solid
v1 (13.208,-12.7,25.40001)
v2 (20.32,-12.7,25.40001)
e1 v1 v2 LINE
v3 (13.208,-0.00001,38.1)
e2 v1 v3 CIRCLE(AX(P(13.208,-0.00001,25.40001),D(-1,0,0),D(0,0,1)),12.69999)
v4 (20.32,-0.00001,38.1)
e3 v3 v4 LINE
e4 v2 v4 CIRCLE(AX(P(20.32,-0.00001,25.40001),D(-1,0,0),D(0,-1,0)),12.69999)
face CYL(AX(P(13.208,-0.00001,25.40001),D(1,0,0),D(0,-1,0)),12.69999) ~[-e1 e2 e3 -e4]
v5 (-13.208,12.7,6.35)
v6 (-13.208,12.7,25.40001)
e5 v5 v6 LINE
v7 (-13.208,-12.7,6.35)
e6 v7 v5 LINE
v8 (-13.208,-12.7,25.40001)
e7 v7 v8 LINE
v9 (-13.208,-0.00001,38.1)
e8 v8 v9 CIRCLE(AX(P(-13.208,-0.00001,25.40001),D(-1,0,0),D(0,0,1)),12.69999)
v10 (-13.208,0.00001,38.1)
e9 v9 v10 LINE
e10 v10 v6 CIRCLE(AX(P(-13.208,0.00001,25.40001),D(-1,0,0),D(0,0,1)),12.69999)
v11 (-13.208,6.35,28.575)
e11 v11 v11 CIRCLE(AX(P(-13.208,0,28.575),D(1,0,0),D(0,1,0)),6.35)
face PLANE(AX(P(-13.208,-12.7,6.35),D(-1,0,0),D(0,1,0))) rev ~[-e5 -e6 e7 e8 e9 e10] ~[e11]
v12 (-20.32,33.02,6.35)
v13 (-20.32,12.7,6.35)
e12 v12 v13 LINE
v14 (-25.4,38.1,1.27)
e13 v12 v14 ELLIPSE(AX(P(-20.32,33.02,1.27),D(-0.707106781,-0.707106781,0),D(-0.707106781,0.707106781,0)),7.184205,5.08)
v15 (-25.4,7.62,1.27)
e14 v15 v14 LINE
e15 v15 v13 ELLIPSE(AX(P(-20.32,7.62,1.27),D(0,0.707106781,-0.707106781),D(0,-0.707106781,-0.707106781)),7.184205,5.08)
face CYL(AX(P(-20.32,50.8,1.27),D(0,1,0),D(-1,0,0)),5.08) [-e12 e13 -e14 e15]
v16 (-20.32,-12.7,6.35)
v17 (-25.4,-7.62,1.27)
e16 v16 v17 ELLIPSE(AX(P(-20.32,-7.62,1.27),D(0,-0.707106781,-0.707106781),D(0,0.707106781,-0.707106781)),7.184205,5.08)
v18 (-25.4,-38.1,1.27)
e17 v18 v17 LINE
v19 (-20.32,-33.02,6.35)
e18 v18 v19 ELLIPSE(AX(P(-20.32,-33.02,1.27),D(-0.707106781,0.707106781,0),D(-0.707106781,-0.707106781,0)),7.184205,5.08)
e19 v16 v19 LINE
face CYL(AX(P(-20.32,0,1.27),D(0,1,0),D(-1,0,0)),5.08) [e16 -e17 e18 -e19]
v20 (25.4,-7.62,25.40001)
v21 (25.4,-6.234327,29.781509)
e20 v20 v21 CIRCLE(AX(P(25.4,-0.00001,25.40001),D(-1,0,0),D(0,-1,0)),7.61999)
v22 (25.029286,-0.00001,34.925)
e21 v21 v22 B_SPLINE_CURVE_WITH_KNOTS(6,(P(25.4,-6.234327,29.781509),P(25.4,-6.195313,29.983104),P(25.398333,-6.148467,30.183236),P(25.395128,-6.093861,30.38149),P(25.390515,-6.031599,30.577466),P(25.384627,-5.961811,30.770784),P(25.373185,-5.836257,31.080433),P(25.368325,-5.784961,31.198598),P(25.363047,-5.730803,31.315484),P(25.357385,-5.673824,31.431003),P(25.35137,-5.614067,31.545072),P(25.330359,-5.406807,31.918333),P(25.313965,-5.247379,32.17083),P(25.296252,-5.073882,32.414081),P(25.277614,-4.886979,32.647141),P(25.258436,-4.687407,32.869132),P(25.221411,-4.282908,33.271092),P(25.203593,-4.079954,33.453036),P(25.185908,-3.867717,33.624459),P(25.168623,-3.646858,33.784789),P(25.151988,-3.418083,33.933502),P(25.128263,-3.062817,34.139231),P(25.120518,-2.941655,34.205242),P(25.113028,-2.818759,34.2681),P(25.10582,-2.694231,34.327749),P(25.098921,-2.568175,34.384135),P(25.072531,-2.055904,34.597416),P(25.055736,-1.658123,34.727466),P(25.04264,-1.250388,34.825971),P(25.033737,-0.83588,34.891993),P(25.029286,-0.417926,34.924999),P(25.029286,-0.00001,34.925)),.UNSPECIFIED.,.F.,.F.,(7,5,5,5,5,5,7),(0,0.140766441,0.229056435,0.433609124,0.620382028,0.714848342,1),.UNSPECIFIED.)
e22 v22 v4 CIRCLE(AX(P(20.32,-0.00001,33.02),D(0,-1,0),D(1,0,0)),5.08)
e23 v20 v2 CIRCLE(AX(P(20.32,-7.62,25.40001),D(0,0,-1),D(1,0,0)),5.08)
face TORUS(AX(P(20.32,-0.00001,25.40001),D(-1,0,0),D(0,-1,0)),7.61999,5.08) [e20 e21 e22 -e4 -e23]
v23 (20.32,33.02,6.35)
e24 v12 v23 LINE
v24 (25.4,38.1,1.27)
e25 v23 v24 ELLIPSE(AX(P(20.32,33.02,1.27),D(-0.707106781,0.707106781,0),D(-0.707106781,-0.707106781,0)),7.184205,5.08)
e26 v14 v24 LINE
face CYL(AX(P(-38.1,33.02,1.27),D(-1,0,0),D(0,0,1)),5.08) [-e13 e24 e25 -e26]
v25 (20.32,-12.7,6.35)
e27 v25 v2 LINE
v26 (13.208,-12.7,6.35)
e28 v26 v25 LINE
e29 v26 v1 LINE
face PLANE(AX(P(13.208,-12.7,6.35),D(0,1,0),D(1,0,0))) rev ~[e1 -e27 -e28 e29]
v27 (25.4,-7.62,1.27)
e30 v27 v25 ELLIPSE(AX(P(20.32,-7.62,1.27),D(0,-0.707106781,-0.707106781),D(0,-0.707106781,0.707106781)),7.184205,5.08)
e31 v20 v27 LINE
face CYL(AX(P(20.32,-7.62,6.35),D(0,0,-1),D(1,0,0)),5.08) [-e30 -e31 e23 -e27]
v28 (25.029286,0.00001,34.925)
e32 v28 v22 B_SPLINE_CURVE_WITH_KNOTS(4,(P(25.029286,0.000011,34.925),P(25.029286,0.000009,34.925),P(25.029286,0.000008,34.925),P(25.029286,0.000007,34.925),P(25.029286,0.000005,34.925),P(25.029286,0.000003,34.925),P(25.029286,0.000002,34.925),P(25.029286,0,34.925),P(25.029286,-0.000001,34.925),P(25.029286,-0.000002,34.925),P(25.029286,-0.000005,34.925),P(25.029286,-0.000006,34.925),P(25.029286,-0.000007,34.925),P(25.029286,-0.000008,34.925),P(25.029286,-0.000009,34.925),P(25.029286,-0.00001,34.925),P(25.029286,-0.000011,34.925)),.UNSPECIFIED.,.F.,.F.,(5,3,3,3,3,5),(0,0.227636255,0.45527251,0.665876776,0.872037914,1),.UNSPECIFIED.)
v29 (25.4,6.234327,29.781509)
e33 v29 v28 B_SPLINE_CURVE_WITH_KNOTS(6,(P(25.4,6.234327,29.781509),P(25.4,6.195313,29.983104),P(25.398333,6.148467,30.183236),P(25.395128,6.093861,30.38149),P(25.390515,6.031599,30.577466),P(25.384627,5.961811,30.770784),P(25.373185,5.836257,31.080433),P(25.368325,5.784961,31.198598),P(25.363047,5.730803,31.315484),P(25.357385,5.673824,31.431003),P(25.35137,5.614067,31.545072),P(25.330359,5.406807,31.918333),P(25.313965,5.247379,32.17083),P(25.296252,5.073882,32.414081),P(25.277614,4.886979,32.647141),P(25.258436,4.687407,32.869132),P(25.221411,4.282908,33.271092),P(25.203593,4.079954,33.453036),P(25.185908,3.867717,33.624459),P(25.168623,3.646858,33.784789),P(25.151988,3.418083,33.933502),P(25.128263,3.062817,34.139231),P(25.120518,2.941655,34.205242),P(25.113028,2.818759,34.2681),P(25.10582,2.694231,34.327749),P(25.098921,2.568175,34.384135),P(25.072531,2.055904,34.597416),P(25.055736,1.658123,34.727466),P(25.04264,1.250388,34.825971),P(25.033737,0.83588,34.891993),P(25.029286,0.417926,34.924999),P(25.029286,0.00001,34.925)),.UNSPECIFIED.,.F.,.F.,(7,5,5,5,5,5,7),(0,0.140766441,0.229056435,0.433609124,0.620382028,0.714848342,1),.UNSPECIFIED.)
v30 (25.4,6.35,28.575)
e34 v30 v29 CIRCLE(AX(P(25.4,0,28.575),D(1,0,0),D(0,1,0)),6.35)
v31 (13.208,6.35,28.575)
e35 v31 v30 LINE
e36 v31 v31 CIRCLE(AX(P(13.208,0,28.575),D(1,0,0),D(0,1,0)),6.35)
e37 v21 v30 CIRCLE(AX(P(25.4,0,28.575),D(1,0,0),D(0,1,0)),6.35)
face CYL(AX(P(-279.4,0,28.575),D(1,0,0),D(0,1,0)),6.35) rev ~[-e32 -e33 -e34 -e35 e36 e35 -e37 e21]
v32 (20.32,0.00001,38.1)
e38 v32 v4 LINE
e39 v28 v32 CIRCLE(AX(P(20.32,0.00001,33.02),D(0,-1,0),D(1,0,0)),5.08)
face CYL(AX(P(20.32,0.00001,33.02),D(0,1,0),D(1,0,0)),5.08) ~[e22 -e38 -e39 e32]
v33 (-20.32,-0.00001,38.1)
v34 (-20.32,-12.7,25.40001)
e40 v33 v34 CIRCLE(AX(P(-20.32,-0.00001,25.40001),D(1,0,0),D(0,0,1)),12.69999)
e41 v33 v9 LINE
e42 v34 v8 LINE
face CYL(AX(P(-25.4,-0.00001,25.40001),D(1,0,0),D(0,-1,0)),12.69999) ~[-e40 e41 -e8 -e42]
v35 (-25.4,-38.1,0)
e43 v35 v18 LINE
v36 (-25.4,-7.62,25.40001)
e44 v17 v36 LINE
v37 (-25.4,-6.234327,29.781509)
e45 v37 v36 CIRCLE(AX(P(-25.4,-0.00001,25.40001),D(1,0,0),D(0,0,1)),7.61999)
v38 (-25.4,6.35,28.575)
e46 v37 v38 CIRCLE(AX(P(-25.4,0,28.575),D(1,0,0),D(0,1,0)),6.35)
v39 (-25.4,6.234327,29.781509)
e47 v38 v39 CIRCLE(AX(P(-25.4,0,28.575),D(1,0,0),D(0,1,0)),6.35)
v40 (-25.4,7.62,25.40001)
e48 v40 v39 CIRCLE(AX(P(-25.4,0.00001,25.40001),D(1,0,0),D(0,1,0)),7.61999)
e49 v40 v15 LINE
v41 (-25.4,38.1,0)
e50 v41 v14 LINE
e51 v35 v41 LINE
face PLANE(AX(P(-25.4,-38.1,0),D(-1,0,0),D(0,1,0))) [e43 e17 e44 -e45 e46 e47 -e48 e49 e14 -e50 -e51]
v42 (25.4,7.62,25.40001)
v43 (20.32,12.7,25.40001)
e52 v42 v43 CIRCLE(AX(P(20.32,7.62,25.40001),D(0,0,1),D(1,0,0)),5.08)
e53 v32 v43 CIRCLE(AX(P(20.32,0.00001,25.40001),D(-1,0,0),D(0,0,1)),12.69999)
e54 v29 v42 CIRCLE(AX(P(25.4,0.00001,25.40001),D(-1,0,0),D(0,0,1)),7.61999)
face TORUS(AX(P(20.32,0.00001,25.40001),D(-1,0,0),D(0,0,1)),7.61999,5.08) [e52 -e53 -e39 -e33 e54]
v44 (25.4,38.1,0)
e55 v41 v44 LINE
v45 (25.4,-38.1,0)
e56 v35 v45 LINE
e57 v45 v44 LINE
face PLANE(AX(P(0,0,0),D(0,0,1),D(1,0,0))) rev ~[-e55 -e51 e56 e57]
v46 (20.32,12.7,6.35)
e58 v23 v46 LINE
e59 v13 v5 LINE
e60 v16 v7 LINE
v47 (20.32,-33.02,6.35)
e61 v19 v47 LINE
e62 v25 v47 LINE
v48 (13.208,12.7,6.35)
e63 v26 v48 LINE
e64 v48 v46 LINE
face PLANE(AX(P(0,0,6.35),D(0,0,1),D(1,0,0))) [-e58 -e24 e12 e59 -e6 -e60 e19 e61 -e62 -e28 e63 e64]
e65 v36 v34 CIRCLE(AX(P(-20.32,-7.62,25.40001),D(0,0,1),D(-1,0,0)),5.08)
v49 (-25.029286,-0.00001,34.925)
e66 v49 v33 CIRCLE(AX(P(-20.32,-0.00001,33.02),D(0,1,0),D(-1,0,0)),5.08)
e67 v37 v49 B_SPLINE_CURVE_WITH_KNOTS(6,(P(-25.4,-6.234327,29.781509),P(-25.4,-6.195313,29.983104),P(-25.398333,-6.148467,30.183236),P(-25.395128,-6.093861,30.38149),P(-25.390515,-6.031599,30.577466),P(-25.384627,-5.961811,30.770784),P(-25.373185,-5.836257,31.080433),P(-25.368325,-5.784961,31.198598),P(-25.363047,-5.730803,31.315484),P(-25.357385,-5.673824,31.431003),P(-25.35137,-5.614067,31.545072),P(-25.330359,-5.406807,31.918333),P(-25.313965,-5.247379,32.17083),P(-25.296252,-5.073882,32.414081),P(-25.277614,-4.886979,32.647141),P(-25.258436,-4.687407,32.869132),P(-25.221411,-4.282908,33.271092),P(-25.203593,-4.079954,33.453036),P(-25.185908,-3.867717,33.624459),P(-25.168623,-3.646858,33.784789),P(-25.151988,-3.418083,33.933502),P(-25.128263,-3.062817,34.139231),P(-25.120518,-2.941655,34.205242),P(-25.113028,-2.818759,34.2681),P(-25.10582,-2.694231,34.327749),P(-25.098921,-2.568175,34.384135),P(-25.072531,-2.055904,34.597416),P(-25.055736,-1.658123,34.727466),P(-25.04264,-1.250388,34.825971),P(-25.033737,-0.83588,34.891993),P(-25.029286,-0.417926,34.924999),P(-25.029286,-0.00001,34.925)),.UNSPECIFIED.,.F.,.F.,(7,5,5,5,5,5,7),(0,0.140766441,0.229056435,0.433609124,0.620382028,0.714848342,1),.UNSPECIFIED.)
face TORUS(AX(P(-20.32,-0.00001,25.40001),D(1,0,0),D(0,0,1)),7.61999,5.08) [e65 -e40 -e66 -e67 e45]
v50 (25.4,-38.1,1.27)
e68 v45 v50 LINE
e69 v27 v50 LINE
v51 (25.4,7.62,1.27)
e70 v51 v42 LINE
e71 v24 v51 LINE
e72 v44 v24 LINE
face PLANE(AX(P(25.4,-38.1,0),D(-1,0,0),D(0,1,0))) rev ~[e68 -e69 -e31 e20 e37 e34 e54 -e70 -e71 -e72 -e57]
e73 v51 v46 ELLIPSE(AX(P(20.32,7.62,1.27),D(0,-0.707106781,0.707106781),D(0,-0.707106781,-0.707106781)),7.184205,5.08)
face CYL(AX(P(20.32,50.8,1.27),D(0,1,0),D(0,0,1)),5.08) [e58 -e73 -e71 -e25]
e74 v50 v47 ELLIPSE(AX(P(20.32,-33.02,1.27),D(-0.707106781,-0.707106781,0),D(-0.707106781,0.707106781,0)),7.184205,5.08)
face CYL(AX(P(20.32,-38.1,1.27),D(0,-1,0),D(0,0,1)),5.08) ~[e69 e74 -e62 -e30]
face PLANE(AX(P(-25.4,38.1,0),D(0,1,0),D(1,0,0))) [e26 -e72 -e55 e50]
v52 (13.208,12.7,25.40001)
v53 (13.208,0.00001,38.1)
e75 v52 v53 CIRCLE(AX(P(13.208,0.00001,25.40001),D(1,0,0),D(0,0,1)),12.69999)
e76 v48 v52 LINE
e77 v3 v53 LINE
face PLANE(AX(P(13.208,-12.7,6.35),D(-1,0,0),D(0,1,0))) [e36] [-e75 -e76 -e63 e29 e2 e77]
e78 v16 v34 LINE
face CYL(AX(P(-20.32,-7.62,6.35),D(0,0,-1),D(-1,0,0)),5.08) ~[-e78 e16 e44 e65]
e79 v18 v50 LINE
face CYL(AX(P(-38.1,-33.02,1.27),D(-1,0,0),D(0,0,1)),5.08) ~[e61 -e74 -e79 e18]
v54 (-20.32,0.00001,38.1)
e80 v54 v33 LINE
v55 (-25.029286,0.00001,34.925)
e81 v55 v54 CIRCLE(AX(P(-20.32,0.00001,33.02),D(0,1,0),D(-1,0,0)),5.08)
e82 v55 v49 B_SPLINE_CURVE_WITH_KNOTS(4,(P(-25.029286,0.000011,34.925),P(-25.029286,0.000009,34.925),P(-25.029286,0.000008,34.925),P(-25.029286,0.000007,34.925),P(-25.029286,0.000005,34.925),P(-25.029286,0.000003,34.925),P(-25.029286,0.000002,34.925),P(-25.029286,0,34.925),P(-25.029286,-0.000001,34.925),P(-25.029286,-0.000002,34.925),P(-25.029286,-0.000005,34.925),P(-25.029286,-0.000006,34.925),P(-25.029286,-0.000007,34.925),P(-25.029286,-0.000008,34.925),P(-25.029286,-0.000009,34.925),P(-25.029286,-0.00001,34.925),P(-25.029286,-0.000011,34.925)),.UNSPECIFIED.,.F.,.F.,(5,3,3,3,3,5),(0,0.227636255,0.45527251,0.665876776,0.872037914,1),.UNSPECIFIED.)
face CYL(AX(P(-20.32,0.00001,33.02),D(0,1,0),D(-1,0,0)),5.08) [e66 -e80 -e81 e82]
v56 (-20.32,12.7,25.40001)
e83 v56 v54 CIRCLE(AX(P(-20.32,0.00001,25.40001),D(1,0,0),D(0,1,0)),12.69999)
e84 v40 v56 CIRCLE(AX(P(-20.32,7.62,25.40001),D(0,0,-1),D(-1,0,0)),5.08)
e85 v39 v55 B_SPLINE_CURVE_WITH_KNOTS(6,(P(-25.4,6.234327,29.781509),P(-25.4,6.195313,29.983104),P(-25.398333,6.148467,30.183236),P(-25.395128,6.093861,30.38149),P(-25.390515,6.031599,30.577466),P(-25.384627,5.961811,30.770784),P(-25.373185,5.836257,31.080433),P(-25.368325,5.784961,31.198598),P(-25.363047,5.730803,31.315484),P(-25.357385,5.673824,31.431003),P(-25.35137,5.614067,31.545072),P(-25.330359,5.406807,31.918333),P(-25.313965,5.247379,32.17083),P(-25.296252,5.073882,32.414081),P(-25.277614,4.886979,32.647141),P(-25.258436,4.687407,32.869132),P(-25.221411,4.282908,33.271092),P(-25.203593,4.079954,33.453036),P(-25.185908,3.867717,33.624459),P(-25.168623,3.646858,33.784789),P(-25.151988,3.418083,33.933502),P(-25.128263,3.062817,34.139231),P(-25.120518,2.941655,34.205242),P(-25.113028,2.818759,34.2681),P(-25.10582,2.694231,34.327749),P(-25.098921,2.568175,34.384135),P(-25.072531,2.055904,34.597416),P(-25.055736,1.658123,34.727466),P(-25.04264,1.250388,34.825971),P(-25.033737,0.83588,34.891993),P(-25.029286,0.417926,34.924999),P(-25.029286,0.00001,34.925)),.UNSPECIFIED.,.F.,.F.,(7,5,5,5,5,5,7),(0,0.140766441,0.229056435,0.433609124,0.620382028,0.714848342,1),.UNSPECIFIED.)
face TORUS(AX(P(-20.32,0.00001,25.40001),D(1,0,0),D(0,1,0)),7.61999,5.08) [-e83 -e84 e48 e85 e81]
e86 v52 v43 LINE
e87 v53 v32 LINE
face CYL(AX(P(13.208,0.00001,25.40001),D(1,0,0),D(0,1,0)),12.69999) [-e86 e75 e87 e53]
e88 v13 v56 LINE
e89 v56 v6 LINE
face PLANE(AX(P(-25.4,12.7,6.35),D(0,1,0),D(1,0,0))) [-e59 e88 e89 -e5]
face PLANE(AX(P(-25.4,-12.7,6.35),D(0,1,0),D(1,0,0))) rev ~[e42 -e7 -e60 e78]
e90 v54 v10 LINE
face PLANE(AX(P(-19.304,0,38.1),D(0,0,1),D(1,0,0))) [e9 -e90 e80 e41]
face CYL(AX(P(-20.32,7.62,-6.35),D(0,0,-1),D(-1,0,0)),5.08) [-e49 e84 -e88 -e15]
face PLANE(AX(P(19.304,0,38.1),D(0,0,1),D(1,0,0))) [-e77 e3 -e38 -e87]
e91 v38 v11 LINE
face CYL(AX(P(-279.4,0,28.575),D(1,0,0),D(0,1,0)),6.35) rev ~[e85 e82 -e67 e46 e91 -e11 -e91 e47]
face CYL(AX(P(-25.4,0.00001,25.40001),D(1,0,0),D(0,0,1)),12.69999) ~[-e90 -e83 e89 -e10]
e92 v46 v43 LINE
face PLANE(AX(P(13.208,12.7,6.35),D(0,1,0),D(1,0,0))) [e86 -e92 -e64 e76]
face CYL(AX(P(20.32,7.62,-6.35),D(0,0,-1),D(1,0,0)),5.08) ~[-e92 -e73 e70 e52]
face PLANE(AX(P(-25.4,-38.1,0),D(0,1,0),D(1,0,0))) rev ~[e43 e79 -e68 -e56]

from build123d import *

# Parameters (mm, degrees)
F0_W         = 50.8
F0_H         = 76.2
F1_DEPTH     = 6.35
F2_W         = 12.192
F2_H         = 25.4
F3_DEPTH     = 31.75
F5_D         = 12.7
F5_DEPTH     = 254
F5_TIP       = 3.8154649308
F6_R         = 12.69999
F7_T1_DEPTH  = 19.05001
F7_T3_DEPTH  = 76.2
F7_T5_DEPTH  = 38.1
F7_T7_DEPTH  = 38.1
F7_T9_DEPTH  = 2e-05
F7_T12_ANGLE = 90
F7_T14_ANGLE = 90
F7_T16_ANGLE = 90
F7_T18_ANGLE = 90
F7_T23_DEPTH = 31.75001
F7_T28_DEPTH = 38.1
F7_T35_DEPTH = 38.1
F7_T39_DEPTH = 31.75001
F7_T47_DEPTH = 38.1
F7_T51_DEPTH = 31.75001
F7_T59_DEPTH = 31.75001
F7_T64_DEPTH = 38.1


# Not quite as in the source:
# - a fillet or chamfer that OpenCascade refuses, or shapes differently, is made with other operations: its cross-section is extruded or revolved along the edge and cut away or added
# - a fillet or chamfer is up to 0.001 mm smaller than in the source, because OpenCascade refuses the exact size


with BuildPart() as f1:
    # F0 (on Top) → F1 (new body)
    with BuildSketch(Plane.XY):
        Rectangle(F0_W, F0_H)
    extrude(amount=F1_DEPTH)

    # F2 (on face) → F3 (join)
    with BuildSketch(Plane.XY.offset(6.35)):
        with Locations((-19.304, 0)):
            Rectangle(F2_W, F2_H)
        with Locations((19.304, 0)):
            Rectangle(F2_W, F2_H)
    extrude(amount=F3_DEPTH)

    # F5
    with Locations(Plane(origin=(-25.4, 0, 0), x_dir=(0, -1, 0), z_dir=(-1, 0, 0))):
        with Locations((0, 28.575)):
            Hole(F5_D / 2, depth=F5_DEPTH)
            with Locations((0, 0, -(F5_DEPTH + F5_TIP / 2))):  # 118° drill point
                Cone(0, F5_D / 2, F5_TIP, mode=Mode.SUBTRACT)

    # F6 (radius 12.7 in the source; OpenCascade refuses exactly that, so slightly less here)
    f6_edges = [f1.edges().sort_by_distance(p)[0] for p in [
        (19.304, 12.7, 38.1),
        (19.304, -12.7, 38.1),
        (-19.304, 12.7, 38.1),
        (-19.304, -12.7, 38.1),
    ]]
    fillet(f6_edges, radius=F6_R)

    # F7: fillet of radius 5.08 on 14 edges, made by hand

    # F7_s2 → F7_t1 (cut)
    with BuildSketch(Plane.XY.offset(6.35)):
        with BuildLine():
            ThreePointArc((-25.4, 7.62), (-23.9121024484, 11.2121024484), (-20.32, 12.7))
            Line((-20.32, 12.7), (-25.4, 12.7))
            Line((-25.4, 12.7), (-25.4, 7.62))
        make_face()
        with BuildLine():
            ThreePointArc((25.4, -7.62), (23.9121024484, -11.2121024484), (20.32, -12.7))
            Line((20.32, -12.7), (25.4, -12.7))
            Line((25.4, -12.7), (25.4, -7.62))
        make_face()
        with BuildLine():
            ThreePointArc((-25.4, -7.62), (-23.9121024484, -11.2121024484), (-20.32, -12.7))
            Line((-20.32, -12.7), (-25.4, -12.7))
            Line((-25.4, -12.7), (-25.4, -7.62))
        make_face()
        with BuildLine():
            ThreePointArc((25.4, 7.62), (23.9121024484, 11.2121024484), (20.32, 12.7))
            Line((20.32, 12.7), (25.4, 12.7))
            Line((25.4, 12.7), (25.4, 7.62))
        make_face()
    extrude(amount=F7_T1_DEPTH, mode=Mode.SUBTRACT)

    # F7_s4 → F7_t3 (cut)
    with BuildSketch(Plane.YZ.offset(-38.1)):
        with BuildLine():
            ThreePointArc((-33.02, 6.35), (-36.6121024484, 4.8621024484), (-38.1, 1.27))
            Line((-38.1, 1.27), (-38.1, 6.35))
            Line((-38.1, 6.35), (-33.02, 6.35))
        make_face()
        with BuildLine():
            ThreePointArc((33.02, 6.35), (36.6121024484, 4.8621024484), (38.1, 1.27))
            Line((38.1, 1.27), (38.1, 6.35))
            Line((38.1, 6.35), (33.02, 6.35))
        make_face()
    extrude(amount=F7_T3_DEPTH, mode=Mode.SUBTRACT)

    # F7_s6 → F7_t5 (cut)
    with BuildSketch(Plane.XZ.offset(12.7)):
        with BuildLine():
            ThreePointArc((20.32, 6.35), (23.9121024484, 4.8621024484), (25.4, 1.27))
            Line((25.4, 1.27), (25.4, 6.35))
            Line((25.4, 6.35), (20.32, 6.35))
        make_face()
        with BuildLine():
            ThreePointArc((-25.4, 1.27), (-23.9121024484, 4.8621024484), (-20.32, 6.35))
            Line((-20.32, 6.35), (-25.4, 6.35))
            Line((-25.4, 6.35), (-25.4, 1.27))
        make_face()
    extrude(amount=F7_T5_DEPTH, mode=Mode.SUBTRACT)

    # F7_s8 → F7_t7 (cut)
    with BuildSketch(Plane.XZ.offset(-50.8)):
        with BuildLine():
            ThreePointArc((20.32, 6.35), (23.9121024484, 4.8621024484), (25.4, 1.27))
            Line((25.4, 1.27), (25.4, 6.35))
            Line((25.4, 6.35), (20.32, 6.35))
        make_face()
        with BuildLine():
            ThreePointArc((-25.4, 1.27), (-23.9121024484, 4.8621024484), (-20.32, 6.35))
            Line((-20.32, 6.35), (-25.4, 6.35))
            Line((-25.4, 6.35), (-25.4, 1.27))
        make_face()
    extrude(amount=F7_T7_DEPTH, mode=Mode.SUBTRACT)

    # F7_s10 → F7_t9 (cut)
    with BuildSketch(Plane.XZ.offset(-1e-05)):
        with BuildLine():
            ThreePointArc((25.4, 33.02), (23.9121024484, 36.6121024484), (20.32, 38.1))
            Line((20.32, 38.1), (25.4, 38.1))
            Line((25.4, 38.1), (25.4, 33.02))
        make_face()
        with BuildLine():
            ThreePointArc((-25.4, 33.02), (-23.9121024484, 36.6121024484), (-20.32, 38.1))
            Line((-20.32, 38.1), (-25.4, 38.1))
            Line((-25.4, 38.1), (-25.4, 33.02))
        make_face()
    extrude(amount=F7_T9_DEPTH, mode=Mode.SUBTRACT)

    # F7_s11 → F7_t12 (revolve, cut)
    with BuildSketch(Plane.XY.offset(25.40001)):
        with BuildLine():
            ThreePointArc((-25.4, 7.62), (-23.9121024484, 11.2121024484), (-20.32, 12.7))
            Line((-20.32, 12.7), (-25.4, 12.7))
            Line((-25.4, 12.7), (-25.4, 7.62))
        make_face()
    revolve(axis=Axis((-25.4, 1e-05, 25.40001), (1, 0, 0)), revolution_arc=F7_T12_ANGLE, mode=Mode.SUBTRACT)

    # F7_s13 → F7_t14 (revolve, cut)
    with BuildSketch(Plane.XZ.offset(1e-05)):
        with BuildLine():
            ThreePointArc((-25.4, 33.02), (-23.9121024484, 36.6121024484), (-20.32, 38.1))
            Line((-20.32, 38.1), (-25.4, 38.1))
            Line((-25.4, 38.1), (-25.4, 33.02))
        make_face()
    revolve(axis=Axis((-25.4, -1e-05, 25.40001), (1, 0, 0)), revolution_arc=F7_T14_ANGLE, mode=Mode.SUBTRACT)

    # F7_s15 → F7_t16 (revolve, cut)
    with BuildSketch(Plane.XY.offset(25.40001)):
        with BuildLine():
            ThreePointArc((25.4, -7.62), (23.9121024484, -11.2121024484), (20.32, -12.7))
            Line((20.32, -12.7), (25.4, -12.7))
            Line((25.4, -12.7), (25.4, -7.62))
        make_face()
    revolve(axis=Axis((25.4, -1e-05, 25.40001), (-1, 0, 0)), revolution_arc=F7_T16_ANGLE, mode=Mode.SUBTRACT)

    # F7_s17 → F7_t18 (revolve, cut)
    with BuildSketch(Plane.XZ.offset(-1e-05)):
        with BuildLine():
            ThreePointArc((25.4, 33.02), (23.9121024484, 36.6121024484), (20.32, 38.1))
            Line((20.32, 38.1), (25.4, 38.1))
            Line((25.4, 38.1), (25.4, 33.02))
        make_face()
    revolve(axis=Axis((25.4, 1e-05, 25.40001), (-1, 0, 0)), revolution_arc=F7_T18_ANGLE, mode=Mode.SUBTRACT)


with BuildPart() as f7_tool21:
    # F7_s22 → F7_t23 (new body)
    with BuildSketch(Plane.XY.offset(-6.35)):
        with BuildLine():
            ThreePointArc((-25.4, 7.62), (-23.9121024484, 11.2121024484), (-20.32, 12.7))
            Line((-20.32, 12.7), (-25.4, 12.7))
            Line((-25.4, 12.7), (-25.4, 7.62))
        make_face()
    extrude(amount=F7_T23_DEPTH)

    split(bisect_by=Plane.XY.offset(6.35), keep=Keep.BOTTOM)

    split(bisect_by=Plane.XY, keep=Keep.TOP)


with BuildPart() as f7_tool26:
    # F7_s27 → F7_t28 (new body)
    with BuildSketch(Plane.XZ.offset(-38.1)):
        with BuildLine():
            ThreePointArc((-25.4, 1.27), (-23.9121024484, 4.8621024484), (-20.32, 6.35))
            Line((-20.32, 6.35), (-25.4, 6.35))
            Line((-25.4, 6.35), (-25.4, 1.27))
        make_face()
    extrude(amount=F7_T28_DEPTH)

    split(bisect_by=Plane.XZ.offset(-12.7), keep=Keep.TOP)


with BuildPart() as f7_tool21_1:
    add(f7_tool21.part)

    # F7_t30: intersect F7_tool26
    add(f7_tool26.part, mode=Mode.INTERSECT)


with BuildPart() as f1_1:
    add(f1.part)

    # F7_t19: cut F7_tool21
    add(f7_tool21_1.part, mode=Mode.SUBTRACT)


with BuildPart() as f7_tool33:
    # F7_s34 → F7_t35 (new body)
    with BuildSketch(Plane.XZ.offset(38.1)):
        with BuildLine():
            ThreePointArc((20.32, 6.35), (23.9121024484, 4.8621024484), (25.4, 1.27))
            Line((25.4, 1.27), (25.4, 6.35))
            Line((25.4, 6.35), (20.32, 6.35))
        make_face()
    extrude(amount=-F7_T35_DEPTH)

    split(bisect_by=Plane.XZ.offset(12.7), keep=Keep.BOTTOM)


with BuildPart() as f7_tool37:
    # F7_s38 → F7_t39 (new body)
    with BuildSketch(Plane.XY.offset(-6.35)):
        with BuildLine():
            ThreePointArc((25.4, -7.62), (23.9121024484, -11.2121024484), (20.32, -12.7))
            Line((20.32, -12.7), (25.4, -12.7))
            Line((25.4, -12.7), (25.4, -7.62))
        make_face()
    extrude(amount=F7_T39_DEPTH)

    split(bisect_by=Plane.XY.offset(6.35), keep=Keep.BOTTOM)

    split(bisect_by=Plane.XY, keep=Keep.TOP)


with BuildPart() as f7_tool33_1:
    add(f7_tool33.part)

    # F7_t42: intersect F7_tool37
    add(f7_tool37.part, mode=Mode.INTERSECT)


with BuildPart() as f1_2:
    add(f1_1.part)

    # F7_t31: cut F7_tool33
    add(f7_tool33_1.part, mode=Mode.SUBTRACT)


with BuildPart() as f7_tool45:
    # F7_s46 → F7_t47 (new body)
    with BuildSketch(Plane.XZ):
        with BuildLine():
            ThreePointArc((20.32, 6.35), (23.9121024484, 4.8621024484), (25.4, 1.27))
            Line((25.4, 1.27), (25.4, 6.35))
            Line((25.4, 6.35), (20.32, 6.35))
        make_face()
    extrude(amount=-F7_T47_DEPTH)

    split(bisect_by=Plane.XZ.offset(-12.7), keep=Keep.TOP)


with BuildPart() as f7_tool49:
    # F7_s50 → F7_t51 (new body)
    with BuildSketch(Plane.XY.offset(-6.35)):
        with BuildLine():
            ThreePointArc((25.4, 7.62), (23.9121024484, 11.2121024484), (20.32, 12.7))
            Line((20.32, 12.7), (25.4, 12.7))
            Line((25.4, 12.7), (25.4, 7.62))
        make_face()
    extrude(amount=F7_T51_DEPTH)

    split(bisect_by=Plane.XY.offset(6.35), keep=Keep.BOTTOM)

    split(bisect_by=Plane.XY, keep=Keep.TOP)


with BuildPart() as f7_tool45_1:
    add(f7_tool45.part)

    # F7_t54: intersect F7_tool49
    add(f7_tool49.part, mode=Mode.INTERSECT)


with BuildPart() as f1_3:
    add(f1_2.part)

    # F7_t43: cut F7_tool45
    add(f7_tool45_1.part, mode=Mode.SUBTRACT)


with BuildPart() as f7_tool57:
    # F7_s58 → F7_t59 (new body)
    with BuildSketch(Plane.XY.offset(-6.35)):
        with BuildLine():
            ThreePointArc((-25.4, -7.62), (-23.9121024484, -11.2121024484), (-20.32, -12.7))
            Line((-20.32, -12.7), (-25.4, -12.7))
            Line((-25.4, -12.7), (-25.4, -7.62))
        make_face()
    extrude(amount=F7_T59_DEPTH)

    split(bisect_by=Plane.XY.offset(6.35), keep=Keep.BOTTOM)

    split(bisect_by=Plane.XY, keep=Keep.TOP)


with BuildPart() as f7_tool62:
    # F7_s63 → F7_t64 (new body)
    with BuildSketch(Plane.XZ):
        with BuildLine():
            ThreePointArc((-25.4, 1.27), (-23.9121024484, 4.8621024484), (-20.32, 6.35))
            Line((-20.32, 6.35), (-25.4, 6.35))
            Line((-25.4, 6.35), (-25.4, 1.27))
        make_face()
    extrude(amount=F7_T64_DEPTH)

    split(bisect_by=Plane.XZ.offset(12.7), keep=Keep.BOTTOM)


with BuildPart() as f7_tool57_1:
    add(f7_tool57.part)

    # F7_t66: intersect F7_tool62
    add(f7_tool62.part, mode=Mode.INTERSECT)


with BuildPart() as f1_4:
    add(f1_3.part)

    # F7_t55: cut F7_tool57
    add(f7_tool57_1.part, mode=Mode.SUBTRACT)


solid = f1_4.part
